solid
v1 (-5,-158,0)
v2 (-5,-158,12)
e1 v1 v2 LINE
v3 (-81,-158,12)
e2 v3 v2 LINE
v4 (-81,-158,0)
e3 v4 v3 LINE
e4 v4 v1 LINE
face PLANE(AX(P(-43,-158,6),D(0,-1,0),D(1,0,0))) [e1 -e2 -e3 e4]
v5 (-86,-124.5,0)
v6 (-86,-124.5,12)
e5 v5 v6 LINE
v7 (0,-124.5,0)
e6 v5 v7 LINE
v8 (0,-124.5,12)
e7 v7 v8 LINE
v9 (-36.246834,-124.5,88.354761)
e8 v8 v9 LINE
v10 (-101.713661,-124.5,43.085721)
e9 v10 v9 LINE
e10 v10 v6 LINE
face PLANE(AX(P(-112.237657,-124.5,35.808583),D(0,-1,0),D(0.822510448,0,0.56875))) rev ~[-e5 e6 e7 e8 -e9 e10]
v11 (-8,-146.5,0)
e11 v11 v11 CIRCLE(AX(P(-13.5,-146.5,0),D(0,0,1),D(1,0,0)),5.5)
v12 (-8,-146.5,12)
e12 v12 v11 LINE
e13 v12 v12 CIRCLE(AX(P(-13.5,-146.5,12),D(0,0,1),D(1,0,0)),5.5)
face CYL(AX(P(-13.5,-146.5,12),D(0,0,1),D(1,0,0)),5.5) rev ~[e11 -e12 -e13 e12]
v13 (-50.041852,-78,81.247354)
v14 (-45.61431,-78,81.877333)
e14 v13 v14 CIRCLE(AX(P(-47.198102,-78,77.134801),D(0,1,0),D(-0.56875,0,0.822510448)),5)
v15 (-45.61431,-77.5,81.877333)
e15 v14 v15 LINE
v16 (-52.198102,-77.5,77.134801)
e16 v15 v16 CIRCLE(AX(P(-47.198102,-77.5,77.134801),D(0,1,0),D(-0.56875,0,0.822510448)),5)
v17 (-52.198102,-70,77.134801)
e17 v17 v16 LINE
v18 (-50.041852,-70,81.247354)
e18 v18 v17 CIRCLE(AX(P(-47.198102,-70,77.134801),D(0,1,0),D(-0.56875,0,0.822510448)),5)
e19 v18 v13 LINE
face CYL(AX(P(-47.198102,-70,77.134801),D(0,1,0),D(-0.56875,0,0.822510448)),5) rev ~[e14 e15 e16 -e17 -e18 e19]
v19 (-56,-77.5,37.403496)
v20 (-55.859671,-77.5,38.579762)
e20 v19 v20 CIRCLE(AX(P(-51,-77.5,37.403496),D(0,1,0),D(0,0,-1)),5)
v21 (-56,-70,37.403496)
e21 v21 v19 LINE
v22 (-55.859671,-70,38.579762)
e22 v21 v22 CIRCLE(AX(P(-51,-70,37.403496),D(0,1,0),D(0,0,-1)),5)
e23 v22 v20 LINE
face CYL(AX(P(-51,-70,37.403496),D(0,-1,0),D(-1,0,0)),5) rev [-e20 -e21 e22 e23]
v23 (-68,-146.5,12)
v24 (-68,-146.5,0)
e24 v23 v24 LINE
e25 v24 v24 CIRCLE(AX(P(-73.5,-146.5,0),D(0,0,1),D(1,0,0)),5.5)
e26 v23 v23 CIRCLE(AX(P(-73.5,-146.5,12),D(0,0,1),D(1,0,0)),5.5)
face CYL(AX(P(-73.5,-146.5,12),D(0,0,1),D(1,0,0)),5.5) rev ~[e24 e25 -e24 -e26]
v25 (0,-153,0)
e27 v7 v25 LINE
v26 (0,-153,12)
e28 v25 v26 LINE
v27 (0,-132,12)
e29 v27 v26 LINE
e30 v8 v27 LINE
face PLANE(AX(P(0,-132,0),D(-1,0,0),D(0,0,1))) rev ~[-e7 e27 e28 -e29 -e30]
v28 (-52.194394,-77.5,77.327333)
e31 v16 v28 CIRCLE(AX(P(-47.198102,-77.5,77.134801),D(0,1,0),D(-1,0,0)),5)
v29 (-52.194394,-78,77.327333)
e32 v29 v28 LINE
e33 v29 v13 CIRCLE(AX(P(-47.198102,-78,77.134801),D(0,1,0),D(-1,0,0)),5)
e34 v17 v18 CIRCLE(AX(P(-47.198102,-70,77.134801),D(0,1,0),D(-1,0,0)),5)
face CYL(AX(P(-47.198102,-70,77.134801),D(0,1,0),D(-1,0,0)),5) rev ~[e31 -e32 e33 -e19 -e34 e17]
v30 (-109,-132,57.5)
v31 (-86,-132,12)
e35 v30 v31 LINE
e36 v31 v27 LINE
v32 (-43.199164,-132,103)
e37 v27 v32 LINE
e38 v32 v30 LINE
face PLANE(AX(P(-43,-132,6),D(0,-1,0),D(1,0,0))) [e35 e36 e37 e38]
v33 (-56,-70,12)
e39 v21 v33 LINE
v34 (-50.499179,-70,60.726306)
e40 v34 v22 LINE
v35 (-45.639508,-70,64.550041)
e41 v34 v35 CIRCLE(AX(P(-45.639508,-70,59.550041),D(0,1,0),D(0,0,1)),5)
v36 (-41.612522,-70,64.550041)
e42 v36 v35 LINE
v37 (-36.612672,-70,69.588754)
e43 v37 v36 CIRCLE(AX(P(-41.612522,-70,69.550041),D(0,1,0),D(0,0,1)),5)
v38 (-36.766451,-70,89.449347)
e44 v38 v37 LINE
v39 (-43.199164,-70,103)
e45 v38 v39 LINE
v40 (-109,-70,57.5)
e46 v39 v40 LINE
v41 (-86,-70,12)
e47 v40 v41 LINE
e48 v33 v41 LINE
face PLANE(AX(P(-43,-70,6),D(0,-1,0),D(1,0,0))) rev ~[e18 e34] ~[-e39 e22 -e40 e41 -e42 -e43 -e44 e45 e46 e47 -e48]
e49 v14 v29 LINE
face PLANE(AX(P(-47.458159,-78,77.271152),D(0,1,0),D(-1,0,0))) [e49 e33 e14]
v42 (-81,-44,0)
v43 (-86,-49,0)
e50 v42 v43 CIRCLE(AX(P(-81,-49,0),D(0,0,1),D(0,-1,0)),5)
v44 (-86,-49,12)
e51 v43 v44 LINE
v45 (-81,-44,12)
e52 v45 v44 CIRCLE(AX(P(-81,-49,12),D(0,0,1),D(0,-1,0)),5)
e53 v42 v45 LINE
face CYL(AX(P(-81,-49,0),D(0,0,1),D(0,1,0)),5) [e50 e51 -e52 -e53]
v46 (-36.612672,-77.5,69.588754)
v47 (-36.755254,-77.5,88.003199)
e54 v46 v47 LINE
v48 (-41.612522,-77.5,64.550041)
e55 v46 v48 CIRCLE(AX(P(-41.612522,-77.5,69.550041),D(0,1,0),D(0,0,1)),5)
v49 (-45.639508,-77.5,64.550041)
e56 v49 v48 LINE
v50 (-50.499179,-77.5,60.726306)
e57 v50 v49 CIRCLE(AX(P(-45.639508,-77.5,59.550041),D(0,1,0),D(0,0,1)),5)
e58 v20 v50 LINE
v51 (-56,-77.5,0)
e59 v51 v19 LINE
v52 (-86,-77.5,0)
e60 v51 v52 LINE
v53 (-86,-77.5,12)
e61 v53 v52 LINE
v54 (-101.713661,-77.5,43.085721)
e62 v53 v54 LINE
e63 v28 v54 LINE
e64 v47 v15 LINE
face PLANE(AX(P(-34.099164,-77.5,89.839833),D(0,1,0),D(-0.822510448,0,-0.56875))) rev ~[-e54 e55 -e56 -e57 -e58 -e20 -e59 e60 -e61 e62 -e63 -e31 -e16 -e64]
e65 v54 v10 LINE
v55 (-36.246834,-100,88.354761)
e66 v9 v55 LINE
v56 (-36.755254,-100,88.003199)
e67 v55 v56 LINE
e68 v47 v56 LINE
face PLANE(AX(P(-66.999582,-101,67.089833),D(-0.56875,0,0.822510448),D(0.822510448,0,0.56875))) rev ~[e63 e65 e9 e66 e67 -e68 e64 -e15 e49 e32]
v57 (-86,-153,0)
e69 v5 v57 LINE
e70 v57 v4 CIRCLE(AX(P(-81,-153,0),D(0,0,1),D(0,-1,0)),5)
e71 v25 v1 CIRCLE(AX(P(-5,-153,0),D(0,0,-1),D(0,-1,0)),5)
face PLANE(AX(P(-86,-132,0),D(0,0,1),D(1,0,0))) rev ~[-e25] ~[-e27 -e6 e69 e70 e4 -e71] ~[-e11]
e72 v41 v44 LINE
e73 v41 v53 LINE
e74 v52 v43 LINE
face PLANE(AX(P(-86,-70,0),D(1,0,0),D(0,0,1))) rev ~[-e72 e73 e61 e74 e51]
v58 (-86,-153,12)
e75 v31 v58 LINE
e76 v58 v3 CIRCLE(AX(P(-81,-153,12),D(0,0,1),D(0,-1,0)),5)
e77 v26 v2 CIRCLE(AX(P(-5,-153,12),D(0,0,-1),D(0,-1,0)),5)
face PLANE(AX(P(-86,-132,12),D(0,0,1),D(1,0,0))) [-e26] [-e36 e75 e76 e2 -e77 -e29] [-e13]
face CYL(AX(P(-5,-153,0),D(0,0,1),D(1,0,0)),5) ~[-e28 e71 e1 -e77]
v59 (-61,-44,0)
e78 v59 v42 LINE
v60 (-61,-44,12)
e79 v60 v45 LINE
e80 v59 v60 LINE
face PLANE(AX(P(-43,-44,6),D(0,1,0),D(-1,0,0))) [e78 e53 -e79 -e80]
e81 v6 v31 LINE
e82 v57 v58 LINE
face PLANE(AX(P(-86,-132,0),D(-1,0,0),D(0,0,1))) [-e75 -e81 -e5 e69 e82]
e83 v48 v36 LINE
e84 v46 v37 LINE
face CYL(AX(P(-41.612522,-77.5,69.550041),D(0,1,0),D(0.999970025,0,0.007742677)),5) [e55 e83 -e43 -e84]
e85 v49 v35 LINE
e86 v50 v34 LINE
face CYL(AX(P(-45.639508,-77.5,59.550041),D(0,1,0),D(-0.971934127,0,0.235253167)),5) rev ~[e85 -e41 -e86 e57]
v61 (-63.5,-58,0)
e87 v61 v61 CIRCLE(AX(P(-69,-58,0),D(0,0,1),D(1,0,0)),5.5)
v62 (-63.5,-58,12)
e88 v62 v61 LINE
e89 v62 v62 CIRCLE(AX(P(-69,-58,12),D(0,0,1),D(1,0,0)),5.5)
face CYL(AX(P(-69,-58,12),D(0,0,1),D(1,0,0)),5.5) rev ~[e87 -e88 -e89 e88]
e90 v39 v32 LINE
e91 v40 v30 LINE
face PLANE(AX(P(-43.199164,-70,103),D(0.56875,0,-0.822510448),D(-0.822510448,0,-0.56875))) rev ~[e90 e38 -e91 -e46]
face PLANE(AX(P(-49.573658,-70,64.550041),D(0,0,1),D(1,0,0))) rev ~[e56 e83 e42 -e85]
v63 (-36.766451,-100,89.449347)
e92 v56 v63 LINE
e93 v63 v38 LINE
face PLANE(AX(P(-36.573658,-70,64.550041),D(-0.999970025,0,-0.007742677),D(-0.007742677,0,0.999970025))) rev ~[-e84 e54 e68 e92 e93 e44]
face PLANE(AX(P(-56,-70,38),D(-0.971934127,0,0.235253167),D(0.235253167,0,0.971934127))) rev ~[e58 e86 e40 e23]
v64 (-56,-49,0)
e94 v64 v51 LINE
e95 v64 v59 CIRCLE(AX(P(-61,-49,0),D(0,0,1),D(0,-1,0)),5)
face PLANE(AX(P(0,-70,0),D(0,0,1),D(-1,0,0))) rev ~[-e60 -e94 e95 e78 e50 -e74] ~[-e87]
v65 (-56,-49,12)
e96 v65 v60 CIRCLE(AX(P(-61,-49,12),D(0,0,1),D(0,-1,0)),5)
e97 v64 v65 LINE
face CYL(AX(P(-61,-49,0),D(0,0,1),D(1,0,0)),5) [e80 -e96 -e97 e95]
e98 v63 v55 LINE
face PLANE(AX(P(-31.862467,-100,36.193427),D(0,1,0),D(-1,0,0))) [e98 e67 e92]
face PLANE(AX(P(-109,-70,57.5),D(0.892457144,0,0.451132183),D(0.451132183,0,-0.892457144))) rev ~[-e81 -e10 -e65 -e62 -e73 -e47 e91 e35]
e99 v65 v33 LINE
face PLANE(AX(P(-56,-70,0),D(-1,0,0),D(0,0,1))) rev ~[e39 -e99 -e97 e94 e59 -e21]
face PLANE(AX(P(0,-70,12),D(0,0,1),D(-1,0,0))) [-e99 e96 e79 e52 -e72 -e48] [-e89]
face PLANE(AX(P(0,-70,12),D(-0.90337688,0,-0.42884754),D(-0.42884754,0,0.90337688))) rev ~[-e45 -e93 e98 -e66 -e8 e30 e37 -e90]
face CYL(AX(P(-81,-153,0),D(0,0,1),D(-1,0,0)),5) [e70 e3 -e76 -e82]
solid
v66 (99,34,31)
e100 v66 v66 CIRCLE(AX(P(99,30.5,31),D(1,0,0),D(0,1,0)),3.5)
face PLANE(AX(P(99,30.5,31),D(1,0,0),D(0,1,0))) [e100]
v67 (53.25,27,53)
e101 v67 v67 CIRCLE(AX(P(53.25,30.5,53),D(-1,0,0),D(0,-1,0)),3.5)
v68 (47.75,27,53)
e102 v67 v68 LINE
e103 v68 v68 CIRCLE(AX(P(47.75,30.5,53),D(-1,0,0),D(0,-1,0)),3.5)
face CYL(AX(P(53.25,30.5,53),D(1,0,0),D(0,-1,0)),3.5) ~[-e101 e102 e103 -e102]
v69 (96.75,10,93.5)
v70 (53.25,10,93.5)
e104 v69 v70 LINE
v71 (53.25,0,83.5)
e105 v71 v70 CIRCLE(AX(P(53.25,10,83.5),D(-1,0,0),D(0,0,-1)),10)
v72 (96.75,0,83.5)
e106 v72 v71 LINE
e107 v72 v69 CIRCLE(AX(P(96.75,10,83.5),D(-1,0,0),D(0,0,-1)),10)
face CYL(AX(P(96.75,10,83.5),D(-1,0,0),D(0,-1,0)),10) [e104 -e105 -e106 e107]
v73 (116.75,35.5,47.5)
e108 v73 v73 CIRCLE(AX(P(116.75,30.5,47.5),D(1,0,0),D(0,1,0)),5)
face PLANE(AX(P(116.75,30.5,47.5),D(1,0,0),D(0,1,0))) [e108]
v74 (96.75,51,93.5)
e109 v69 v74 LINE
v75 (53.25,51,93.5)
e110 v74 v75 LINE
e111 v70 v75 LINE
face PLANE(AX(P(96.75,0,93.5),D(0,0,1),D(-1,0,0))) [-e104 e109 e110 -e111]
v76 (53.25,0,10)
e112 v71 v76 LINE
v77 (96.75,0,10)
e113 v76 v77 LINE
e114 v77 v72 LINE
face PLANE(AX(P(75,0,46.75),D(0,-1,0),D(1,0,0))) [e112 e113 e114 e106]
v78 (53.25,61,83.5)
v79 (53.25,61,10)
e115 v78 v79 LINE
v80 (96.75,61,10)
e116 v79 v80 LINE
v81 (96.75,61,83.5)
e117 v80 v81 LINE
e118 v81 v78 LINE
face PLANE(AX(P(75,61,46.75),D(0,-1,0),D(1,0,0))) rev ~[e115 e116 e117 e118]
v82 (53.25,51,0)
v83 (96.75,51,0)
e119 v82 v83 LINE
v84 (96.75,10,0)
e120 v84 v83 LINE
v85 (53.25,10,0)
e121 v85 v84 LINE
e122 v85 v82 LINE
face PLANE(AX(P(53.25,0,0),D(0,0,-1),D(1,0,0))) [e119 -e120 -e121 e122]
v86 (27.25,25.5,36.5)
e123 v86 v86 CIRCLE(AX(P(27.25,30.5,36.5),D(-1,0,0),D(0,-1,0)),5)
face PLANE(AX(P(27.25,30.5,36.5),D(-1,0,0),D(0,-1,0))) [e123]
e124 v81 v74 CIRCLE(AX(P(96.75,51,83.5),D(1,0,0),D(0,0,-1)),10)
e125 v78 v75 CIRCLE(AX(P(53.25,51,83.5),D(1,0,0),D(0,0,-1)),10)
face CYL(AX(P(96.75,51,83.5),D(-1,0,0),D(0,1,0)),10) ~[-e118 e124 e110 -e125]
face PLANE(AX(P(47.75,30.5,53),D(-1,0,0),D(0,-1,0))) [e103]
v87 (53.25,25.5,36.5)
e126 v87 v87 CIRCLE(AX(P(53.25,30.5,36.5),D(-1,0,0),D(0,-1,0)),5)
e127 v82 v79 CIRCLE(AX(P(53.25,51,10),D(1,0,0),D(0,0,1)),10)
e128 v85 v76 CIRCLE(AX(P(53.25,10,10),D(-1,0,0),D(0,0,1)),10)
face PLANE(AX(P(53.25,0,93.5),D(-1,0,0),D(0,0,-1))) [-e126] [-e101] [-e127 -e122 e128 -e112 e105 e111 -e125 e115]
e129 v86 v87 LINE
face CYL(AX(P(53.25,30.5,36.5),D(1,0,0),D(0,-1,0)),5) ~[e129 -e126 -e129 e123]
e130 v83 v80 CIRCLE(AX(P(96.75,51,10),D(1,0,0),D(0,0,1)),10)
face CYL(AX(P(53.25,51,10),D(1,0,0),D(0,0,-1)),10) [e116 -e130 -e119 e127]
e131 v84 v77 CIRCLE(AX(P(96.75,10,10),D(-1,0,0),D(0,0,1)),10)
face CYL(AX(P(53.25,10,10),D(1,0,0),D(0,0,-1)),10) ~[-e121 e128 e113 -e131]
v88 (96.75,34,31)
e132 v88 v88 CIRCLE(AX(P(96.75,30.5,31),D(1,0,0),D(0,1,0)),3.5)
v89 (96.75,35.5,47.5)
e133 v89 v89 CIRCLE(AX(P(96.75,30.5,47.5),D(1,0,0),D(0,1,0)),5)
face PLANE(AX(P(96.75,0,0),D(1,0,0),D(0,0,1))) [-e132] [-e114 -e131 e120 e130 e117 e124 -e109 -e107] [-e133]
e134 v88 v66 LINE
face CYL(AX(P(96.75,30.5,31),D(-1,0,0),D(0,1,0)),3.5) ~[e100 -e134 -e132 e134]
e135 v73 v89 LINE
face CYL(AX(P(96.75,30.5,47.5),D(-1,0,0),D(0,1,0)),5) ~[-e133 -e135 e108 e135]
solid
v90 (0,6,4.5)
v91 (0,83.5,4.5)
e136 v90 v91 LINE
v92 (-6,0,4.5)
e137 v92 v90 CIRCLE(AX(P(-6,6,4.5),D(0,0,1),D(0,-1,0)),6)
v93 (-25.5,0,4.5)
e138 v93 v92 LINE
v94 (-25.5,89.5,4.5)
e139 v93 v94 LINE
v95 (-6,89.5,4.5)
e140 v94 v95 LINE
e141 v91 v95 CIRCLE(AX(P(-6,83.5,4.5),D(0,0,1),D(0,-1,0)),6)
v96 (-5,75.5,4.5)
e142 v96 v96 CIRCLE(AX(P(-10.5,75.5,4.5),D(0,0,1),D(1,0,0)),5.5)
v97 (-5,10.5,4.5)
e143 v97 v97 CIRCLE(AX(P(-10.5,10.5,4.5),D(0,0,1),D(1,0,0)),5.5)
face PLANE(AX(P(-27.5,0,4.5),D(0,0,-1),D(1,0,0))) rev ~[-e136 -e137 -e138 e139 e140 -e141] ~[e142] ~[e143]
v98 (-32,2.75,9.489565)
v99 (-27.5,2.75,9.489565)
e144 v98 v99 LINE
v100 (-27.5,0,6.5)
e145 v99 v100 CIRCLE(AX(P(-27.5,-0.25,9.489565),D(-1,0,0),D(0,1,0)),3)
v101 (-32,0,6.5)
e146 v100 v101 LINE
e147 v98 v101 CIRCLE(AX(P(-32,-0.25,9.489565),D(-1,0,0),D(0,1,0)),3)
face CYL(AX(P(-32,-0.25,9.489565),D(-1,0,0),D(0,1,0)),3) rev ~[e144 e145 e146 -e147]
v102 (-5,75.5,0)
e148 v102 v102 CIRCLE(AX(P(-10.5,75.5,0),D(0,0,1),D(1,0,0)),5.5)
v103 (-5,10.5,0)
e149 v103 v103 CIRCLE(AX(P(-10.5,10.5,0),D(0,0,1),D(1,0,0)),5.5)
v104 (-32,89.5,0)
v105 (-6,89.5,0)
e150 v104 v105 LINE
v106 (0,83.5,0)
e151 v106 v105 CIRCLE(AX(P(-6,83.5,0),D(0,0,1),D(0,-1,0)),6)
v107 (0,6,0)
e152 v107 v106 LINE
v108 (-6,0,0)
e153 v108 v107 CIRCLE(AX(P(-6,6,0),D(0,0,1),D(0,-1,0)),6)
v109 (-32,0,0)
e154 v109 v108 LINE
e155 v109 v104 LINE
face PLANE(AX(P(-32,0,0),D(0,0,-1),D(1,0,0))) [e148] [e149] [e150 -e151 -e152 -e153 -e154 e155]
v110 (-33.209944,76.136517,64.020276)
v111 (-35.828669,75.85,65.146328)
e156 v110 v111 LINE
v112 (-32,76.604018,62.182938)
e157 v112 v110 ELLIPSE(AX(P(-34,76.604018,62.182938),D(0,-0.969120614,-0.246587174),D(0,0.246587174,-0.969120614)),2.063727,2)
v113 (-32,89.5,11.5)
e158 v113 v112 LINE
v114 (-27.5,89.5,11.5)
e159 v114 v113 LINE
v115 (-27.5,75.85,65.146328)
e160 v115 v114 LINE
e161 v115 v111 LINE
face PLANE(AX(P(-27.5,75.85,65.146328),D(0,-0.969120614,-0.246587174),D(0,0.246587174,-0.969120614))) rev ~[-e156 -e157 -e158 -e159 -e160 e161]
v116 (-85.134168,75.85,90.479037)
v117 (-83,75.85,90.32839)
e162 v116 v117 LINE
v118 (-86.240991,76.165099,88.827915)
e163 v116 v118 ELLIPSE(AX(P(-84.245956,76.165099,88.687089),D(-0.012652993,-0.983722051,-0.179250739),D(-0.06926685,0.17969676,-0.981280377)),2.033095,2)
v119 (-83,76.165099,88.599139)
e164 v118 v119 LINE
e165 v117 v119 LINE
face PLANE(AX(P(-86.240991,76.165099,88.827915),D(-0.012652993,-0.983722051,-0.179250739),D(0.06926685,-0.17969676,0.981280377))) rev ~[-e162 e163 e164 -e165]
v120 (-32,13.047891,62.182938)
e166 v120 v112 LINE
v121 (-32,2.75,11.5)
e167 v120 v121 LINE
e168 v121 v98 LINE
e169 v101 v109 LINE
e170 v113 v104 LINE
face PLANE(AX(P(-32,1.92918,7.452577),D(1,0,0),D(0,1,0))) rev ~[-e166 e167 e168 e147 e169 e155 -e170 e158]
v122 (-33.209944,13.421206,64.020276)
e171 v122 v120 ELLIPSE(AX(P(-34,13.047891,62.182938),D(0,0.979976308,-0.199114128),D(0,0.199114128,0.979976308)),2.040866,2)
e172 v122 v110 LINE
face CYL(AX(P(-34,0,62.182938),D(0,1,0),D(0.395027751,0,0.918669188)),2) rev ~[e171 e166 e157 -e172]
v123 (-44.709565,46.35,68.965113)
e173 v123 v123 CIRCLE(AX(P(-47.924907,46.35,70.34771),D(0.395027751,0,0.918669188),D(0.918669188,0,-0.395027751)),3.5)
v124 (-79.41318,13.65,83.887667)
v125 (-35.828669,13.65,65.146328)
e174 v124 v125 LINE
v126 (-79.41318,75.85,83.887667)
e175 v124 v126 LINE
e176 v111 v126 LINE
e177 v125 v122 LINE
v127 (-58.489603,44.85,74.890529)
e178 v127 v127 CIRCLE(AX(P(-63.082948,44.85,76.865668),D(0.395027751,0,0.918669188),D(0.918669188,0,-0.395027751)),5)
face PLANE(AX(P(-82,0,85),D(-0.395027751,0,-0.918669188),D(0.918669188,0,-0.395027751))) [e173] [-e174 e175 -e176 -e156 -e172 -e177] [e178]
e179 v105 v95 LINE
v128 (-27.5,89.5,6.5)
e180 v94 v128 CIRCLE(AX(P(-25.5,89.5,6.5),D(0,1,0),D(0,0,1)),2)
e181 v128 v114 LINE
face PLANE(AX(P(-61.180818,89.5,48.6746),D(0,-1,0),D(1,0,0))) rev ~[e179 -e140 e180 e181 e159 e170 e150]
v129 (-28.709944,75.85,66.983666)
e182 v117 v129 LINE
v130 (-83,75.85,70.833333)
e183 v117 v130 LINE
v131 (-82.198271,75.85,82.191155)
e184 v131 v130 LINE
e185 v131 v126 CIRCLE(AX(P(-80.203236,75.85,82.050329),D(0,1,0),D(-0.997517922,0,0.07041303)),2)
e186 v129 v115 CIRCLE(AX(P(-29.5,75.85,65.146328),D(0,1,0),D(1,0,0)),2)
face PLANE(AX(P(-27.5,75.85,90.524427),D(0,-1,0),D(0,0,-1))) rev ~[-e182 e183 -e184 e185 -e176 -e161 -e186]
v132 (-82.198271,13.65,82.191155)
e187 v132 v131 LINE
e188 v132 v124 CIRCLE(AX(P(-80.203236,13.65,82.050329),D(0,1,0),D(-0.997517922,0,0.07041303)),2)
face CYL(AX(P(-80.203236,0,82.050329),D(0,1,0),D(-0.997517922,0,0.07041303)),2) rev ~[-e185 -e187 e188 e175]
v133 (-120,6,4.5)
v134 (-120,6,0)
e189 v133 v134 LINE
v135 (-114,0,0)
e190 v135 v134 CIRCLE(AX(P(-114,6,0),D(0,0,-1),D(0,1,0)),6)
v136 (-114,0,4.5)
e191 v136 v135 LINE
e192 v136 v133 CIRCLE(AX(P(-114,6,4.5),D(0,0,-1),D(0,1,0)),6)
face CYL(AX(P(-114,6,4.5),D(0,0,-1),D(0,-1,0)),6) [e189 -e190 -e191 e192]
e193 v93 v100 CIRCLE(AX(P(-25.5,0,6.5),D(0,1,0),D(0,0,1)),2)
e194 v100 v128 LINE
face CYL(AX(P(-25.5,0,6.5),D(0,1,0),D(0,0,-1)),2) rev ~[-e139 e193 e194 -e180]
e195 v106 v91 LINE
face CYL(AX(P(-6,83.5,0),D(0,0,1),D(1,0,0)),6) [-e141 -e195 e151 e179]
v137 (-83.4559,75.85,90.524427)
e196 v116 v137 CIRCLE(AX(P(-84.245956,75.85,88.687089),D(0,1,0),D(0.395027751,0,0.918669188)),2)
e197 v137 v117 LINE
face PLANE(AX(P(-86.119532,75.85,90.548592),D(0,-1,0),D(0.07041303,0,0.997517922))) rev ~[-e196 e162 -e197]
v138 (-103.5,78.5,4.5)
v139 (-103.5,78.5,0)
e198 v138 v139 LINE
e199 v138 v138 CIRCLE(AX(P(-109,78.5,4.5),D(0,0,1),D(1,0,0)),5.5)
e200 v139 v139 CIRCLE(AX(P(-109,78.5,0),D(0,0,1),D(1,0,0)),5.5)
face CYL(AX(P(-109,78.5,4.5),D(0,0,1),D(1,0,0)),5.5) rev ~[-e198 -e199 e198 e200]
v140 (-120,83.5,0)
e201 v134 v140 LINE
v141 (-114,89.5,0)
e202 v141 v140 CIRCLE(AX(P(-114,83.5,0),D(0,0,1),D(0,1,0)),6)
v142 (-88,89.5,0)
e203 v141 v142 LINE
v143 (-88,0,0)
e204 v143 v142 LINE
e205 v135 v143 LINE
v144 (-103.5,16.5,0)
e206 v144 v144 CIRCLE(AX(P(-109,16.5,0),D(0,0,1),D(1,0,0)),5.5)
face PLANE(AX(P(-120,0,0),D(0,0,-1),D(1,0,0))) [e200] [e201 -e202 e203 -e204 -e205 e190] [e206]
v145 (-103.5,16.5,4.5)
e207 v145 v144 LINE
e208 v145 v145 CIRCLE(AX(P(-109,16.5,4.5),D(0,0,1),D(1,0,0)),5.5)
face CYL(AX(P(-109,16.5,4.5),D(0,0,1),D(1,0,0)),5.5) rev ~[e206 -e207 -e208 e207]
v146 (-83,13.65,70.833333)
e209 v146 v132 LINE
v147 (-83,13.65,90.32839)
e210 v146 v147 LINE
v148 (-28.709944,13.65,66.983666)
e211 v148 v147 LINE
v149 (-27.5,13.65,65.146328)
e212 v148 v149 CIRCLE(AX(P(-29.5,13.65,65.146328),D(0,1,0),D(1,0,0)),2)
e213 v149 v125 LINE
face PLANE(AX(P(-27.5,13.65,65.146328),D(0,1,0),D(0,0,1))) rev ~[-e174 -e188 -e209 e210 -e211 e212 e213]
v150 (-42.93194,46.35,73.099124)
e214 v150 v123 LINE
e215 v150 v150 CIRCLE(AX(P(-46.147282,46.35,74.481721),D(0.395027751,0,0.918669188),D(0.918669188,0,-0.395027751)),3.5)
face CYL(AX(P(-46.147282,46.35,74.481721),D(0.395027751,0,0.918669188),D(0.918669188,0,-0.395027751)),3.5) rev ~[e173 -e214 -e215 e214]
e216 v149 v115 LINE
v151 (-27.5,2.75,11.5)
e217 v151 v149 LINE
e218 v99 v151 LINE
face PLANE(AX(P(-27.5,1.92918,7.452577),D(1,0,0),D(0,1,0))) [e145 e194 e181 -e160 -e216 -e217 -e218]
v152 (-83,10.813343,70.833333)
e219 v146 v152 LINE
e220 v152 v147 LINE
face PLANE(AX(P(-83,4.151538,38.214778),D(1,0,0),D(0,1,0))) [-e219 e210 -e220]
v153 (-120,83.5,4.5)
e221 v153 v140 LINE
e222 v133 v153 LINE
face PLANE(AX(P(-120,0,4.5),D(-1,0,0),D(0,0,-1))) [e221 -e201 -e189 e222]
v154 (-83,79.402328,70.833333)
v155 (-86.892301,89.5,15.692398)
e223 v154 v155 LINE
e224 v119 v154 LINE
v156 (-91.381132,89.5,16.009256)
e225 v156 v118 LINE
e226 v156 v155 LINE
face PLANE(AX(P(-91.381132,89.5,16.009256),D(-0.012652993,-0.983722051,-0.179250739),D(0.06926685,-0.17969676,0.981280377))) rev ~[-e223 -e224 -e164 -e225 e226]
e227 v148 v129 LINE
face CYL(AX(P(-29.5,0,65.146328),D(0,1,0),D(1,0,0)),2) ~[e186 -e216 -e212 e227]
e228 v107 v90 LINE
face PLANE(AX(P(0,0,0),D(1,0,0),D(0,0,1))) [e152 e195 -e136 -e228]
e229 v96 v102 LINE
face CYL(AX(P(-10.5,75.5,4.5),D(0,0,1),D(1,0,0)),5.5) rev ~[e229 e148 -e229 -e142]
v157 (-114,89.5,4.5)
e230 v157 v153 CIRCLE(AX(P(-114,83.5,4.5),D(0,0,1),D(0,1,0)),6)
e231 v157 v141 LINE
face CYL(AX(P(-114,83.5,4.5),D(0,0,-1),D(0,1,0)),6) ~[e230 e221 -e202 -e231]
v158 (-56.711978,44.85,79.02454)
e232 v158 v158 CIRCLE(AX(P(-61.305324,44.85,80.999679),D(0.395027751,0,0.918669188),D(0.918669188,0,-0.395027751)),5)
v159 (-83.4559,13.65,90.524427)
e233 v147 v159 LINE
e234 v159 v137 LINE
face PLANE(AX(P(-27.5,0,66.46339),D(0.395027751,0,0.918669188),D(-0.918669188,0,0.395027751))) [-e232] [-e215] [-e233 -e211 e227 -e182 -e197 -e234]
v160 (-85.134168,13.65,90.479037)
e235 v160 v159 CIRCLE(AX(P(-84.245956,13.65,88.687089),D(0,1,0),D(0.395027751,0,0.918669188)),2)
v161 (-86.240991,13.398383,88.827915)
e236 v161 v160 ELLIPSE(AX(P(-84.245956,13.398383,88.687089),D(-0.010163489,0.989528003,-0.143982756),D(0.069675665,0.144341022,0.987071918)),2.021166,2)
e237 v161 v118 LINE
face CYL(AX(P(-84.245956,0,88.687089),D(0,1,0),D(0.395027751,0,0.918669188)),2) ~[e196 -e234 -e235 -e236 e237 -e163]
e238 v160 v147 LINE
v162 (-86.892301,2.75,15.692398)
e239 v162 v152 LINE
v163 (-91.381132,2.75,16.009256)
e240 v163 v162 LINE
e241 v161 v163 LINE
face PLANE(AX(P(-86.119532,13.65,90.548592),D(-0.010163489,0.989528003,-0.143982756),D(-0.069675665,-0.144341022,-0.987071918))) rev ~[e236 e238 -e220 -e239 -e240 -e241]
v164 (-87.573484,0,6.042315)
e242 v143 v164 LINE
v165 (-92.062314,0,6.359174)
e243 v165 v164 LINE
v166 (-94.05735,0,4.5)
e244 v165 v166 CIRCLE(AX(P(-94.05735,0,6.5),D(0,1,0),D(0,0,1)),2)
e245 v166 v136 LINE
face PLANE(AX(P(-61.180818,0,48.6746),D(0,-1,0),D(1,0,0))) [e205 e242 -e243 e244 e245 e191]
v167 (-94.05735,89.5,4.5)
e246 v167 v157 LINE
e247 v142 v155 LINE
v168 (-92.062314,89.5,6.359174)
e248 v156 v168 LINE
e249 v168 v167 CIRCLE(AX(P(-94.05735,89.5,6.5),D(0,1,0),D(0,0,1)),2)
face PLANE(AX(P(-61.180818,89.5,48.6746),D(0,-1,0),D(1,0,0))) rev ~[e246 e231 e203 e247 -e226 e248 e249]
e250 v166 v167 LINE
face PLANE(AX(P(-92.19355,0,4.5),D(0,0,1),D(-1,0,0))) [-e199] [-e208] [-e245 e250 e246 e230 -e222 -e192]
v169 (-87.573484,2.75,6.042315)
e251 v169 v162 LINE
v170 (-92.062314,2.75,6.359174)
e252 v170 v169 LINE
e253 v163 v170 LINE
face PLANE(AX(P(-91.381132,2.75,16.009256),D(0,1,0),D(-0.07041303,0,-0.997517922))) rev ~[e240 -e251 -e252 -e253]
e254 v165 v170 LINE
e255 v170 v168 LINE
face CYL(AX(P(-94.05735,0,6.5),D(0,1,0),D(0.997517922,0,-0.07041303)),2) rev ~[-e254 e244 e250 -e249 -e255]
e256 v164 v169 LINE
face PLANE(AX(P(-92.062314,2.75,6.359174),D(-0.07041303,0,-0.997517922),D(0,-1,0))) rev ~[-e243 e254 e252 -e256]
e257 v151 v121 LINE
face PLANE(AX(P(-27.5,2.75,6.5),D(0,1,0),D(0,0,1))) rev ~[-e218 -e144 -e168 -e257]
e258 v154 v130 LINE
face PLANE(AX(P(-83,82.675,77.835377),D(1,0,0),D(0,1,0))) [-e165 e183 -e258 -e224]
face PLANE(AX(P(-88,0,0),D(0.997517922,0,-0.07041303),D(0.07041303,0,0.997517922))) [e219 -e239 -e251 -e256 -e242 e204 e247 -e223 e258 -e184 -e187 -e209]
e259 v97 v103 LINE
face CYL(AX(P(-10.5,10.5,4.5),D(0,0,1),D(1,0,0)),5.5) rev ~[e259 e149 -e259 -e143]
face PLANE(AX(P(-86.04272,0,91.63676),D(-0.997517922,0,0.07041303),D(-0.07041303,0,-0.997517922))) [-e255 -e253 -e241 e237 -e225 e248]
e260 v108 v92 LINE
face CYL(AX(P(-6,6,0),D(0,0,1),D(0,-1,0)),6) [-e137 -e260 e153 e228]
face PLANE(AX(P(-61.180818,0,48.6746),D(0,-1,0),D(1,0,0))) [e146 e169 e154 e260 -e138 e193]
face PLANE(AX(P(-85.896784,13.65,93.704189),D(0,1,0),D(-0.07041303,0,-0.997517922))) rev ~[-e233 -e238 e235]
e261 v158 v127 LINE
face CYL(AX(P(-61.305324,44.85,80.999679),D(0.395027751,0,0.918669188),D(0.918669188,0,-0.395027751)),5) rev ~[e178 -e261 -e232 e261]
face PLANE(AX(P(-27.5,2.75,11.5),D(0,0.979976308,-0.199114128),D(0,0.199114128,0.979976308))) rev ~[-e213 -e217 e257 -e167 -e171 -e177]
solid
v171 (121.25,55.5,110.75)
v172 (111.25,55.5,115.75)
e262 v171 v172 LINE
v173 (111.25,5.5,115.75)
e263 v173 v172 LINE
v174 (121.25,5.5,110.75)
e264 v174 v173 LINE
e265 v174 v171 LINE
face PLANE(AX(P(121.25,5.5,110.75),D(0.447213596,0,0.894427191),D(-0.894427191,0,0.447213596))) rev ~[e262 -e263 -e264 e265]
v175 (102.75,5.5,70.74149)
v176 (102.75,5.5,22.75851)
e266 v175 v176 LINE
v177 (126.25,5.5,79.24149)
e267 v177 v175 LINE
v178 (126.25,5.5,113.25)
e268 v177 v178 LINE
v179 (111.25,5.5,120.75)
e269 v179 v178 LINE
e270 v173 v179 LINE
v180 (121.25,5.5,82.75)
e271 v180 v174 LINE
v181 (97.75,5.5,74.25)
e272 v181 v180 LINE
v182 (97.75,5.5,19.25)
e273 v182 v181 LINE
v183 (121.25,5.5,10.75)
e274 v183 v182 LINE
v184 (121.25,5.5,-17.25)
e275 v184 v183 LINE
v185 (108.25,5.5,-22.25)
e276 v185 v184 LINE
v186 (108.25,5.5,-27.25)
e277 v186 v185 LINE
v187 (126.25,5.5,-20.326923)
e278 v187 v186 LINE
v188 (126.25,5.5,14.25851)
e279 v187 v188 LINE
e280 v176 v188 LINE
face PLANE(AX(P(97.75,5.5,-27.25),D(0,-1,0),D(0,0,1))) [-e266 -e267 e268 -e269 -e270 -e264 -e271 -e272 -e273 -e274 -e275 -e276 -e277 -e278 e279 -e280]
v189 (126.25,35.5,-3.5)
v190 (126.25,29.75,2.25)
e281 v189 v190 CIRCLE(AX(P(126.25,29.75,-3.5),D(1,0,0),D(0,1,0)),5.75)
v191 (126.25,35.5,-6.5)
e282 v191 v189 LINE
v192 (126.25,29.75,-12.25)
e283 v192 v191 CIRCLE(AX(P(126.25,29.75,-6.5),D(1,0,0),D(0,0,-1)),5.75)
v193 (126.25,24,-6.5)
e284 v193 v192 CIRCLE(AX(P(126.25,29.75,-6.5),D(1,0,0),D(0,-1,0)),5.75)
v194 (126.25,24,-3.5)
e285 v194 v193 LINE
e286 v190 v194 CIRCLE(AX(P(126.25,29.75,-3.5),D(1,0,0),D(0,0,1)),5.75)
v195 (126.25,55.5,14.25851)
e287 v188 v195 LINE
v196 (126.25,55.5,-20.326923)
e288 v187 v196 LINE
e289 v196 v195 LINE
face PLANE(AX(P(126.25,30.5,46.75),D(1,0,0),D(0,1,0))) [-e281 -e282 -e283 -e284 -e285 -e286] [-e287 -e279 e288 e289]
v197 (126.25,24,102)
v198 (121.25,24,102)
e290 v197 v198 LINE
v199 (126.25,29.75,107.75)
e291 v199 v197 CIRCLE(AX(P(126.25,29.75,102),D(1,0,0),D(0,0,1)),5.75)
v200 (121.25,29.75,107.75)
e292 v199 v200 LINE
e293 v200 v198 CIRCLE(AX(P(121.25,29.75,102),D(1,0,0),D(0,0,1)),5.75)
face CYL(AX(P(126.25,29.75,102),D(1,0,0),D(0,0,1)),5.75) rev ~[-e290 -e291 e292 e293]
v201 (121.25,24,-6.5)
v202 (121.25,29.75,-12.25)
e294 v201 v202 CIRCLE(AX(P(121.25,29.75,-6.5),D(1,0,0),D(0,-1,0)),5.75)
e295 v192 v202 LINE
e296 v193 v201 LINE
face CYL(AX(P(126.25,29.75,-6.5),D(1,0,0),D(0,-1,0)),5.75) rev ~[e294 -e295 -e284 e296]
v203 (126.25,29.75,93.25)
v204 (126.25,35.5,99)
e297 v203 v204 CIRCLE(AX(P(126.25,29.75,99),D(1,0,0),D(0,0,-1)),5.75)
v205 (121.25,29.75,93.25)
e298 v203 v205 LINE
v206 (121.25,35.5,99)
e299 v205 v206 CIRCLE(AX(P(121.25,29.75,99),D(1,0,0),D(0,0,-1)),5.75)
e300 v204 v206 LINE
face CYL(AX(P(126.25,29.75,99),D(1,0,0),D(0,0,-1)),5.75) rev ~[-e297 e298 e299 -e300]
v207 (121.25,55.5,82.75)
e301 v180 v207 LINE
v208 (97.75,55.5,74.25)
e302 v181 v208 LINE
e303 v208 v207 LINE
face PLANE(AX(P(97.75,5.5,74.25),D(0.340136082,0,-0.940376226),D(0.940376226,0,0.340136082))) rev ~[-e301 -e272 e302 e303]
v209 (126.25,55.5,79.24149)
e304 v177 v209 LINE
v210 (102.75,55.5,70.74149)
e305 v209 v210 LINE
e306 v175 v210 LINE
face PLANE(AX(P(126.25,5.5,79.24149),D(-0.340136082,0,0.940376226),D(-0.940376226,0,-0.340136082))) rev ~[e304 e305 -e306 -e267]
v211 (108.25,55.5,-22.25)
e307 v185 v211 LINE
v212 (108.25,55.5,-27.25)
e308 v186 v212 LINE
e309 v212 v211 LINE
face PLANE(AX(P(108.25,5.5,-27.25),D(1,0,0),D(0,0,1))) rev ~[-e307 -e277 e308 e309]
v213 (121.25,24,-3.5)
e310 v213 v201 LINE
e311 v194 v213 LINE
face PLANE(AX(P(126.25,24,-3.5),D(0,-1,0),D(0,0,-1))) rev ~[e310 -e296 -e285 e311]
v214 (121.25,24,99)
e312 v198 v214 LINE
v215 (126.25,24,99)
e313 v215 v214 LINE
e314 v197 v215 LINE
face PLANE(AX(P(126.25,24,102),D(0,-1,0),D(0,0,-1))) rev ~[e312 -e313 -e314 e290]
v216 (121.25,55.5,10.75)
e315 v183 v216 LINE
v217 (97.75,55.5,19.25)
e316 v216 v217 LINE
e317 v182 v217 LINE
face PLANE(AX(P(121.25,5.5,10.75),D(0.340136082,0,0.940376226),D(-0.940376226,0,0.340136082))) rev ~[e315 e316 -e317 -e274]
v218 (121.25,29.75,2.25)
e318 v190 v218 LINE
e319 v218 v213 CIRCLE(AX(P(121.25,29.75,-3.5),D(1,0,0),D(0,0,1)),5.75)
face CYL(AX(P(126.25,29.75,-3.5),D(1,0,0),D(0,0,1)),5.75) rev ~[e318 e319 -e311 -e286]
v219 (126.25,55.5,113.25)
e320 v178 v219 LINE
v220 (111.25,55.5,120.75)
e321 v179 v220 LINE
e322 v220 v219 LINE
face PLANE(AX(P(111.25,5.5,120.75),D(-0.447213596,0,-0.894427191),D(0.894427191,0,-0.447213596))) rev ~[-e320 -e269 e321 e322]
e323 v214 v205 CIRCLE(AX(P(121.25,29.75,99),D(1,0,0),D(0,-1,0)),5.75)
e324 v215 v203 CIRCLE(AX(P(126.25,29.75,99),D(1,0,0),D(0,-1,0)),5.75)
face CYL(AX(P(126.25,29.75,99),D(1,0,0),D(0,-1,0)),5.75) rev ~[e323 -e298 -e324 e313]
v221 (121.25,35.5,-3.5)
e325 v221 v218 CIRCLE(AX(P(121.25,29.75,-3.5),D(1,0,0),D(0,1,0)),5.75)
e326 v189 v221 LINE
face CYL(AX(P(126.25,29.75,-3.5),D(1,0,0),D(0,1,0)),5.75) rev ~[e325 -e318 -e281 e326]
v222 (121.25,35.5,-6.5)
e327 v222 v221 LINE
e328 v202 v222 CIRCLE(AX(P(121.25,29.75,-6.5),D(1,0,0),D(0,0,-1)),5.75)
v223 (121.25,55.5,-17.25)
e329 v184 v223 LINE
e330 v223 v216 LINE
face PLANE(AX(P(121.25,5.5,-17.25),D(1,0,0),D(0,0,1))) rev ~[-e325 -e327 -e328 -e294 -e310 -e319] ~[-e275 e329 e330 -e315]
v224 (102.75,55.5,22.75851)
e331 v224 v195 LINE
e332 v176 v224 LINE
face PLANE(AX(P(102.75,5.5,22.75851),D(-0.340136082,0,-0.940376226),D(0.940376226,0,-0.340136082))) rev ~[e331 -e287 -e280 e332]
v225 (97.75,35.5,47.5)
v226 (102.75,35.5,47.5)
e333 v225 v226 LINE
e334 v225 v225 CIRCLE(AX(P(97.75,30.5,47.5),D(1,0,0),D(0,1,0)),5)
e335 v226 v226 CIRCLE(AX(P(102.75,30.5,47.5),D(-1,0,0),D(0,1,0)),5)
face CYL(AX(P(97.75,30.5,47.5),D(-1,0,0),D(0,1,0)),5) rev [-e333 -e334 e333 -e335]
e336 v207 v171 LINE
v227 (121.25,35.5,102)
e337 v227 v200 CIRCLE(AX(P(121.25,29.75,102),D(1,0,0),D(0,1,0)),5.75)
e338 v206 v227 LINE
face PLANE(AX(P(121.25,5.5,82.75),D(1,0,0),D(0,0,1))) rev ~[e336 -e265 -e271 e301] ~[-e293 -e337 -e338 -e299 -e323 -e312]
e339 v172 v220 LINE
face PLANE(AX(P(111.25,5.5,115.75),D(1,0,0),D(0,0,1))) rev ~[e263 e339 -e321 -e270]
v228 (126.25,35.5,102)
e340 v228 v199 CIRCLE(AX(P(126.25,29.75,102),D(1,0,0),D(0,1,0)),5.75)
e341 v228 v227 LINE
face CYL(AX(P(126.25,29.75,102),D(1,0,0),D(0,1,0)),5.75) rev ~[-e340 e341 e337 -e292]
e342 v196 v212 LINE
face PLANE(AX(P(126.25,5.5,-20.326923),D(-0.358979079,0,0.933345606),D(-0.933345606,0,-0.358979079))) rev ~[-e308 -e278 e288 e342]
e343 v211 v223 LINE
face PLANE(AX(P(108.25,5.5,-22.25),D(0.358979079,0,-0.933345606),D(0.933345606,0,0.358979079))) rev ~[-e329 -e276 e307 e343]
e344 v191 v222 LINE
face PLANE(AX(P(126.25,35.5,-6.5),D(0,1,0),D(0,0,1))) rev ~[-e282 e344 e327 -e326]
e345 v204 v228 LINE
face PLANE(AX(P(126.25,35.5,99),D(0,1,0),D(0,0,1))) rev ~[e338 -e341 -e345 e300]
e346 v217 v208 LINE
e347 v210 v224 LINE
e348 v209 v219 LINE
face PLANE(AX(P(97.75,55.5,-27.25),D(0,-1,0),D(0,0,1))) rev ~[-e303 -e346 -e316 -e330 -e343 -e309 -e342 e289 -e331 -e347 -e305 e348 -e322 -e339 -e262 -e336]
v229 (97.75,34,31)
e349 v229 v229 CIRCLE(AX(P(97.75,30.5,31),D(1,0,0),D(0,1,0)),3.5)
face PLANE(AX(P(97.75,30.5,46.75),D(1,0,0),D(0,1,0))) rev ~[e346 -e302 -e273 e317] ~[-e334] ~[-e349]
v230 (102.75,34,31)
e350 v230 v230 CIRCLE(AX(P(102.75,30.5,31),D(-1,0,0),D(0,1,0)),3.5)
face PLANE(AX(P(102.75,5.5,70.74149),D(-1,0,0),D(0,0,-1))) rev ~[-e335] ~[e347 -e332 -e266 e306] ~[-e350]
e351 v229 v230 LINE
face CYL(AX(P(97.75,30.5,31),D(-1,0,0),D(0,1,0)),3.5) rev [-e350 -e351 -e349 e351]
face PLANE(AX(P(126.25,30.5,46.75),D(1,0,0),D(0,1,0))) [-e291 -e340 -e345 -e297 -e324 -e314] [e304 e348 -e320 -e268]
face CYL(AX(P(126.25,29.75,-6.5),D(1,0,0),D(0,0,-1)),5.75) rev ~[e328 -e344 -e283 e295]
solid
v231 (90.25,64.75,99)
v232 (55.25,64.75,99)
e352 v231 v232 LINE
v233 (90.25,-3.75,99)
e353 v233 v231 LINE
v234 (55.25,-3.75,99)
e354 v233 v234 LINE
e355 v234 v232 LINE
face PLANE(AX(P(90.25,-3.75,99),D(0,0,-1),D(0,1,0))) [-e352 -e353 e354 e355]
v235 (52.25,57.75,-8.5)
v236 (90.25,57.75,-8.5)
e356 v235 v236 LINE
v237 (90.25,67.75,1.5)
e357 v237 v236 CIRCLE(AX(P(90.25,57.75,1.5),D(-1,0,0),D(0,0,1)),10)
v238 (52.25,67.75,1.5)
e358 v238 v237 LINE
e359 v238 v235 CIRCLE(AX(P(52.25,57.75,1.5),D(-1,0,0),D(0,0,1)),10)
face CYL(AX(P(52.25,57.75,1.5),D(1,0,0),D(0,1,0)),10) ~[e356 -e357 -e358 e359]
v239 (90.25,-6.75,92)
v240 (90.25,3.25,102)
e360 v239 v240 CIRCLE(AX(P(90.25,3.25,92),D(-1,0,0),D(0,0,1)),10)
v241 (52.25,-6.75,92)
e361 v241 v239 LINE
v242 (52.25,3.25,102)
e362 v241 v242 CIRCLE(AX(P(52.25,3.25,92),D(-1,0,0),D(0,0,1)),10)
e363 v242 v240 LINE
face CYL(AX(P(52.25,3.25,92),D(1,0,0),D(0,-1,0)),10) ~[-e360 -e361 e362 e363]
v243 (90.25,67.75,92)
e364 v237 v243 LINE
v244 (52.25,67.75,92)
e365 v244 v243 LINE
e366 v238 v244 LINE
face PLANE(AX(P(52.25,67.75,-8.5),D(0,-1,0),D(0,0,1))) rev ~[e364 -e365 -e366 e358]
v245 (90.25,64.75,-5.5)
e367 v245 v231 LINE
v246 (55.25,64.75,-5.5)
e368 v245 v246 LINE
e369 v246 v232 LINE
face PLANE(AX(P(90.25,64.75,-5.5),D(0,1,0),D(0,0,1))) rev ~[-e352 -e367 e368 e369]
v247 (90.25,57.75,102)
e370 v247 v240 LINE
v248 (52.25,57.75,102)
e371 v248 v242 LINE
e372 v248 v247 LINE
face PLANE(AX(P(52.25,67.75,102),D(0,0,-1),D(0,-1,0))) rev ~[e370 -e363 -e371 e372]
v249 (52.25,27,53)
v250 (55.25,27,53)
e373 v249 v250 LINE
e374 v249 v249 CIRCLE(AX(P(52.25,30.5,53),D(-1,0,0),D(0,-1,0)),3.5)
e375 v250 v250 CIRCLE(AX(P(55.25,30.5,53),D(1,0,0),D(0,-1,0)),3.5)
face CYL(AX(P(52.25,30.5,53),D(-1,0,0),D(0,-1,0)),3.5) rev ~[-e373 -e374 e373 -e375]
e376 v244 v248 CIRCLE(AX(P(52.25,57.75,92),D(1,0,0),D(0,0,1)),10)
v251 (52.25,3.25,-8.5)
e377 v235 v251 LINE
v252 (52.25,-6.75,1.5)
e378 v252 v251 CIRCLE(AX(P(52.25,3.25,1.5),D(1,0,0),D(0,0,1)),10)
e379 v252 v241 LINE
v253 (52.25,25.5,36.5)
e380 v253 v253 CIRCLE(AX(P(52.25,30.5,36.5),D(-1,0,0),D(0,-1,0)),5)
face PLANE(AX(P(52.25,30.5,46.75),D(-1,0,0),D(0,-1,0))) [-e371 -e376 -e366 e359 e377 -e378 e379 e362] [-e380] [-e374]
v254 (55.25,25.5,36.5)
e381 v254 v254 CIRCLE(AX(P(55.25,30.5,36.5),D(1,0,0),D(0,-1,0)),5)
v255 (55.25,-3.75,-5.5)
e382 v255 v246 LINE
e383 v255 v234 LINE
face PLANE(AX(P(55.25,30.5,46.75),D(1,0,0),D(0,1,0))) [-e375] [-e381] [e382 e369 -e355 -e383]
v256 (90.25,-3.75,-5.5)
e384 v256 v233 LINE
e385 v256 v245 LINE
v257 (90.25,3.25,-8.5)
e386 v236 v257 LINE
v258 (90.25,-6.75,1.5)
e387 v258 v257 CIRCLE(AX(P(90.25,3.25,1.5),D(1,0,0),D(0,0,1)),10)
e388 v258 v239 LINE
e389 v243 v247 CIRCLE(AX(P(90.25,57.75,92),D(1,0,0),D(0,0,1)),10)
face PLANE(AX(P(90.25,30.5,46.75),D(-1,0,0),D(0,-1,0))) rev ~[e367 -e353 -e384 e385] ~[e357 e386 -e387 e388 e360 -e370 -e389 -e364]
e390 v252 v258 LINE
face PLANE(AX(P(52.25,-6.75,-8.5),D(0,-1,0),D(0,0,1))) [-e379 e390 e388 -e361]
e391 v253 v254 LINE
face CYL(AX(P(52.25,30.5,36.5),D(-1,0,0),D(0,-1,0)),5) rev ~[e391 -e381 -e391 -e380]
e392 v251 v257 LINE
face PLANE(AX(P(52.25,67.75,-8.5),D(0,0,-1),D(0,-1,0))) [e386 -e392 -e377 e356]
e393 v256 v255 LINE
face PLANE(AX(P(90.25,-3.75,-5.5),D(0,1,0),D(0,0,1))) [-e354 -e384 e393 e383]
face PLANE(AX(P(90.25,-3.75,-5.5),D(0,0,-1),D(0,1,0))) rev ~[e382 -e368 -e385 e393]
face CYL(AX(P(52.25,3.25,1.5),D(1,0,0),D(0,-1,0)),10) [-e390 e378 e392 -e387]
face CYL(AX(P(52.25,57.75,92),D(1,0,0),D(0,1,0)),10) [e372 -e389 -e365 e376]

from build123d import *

# Parameters (mm, degrees)
F0_W        = 27.5
F0_H        = 4.5
F1_DEPTH    = 89.5
F2_R        = 2
F4_DEPTH    = 55.5
F5_T1_DEPTH = 4.5
F7_DEPTH    = 25
F8_R        = 5.5
F9_DEPTH    = 5
F10_R       = 5.5
F11_DEPTH   = 5
F12_R       = 5
F12_R_2     = 3.5
F13_DEPTH   = 5
F14_R       = 6
F16_DEPTH   = 61
F17_R       = 5
F18_DEPTH   = 20
F17_R_2     = 3.5
F19_DEPTH   = 2.25
F20_R       = 5
F21_DEPTH   = 26
F20_R_2     = 3.5
F22_DEPTH   = 5.5
F23_R       = 10
F25_W       = 74.5
F25_H       = 110.5
F25_R       = 5
F25_R_2     = 3.5
F26_DEPTH   = 38
F27_W       = 68.5
F27_H       = 104.5
F27_R       = 5
F27_R_2     = 3.5
F28_DEPTH   = 35
F29_R       = 10
F31_W       = 50
F31_H       = 148
F31_R       = 3.5
F31_R_2     = 5
F32_DEPTH   = 28.5
F34_DEPTH   = 50
F36_DEPTH   = 5
F38_W       = 86
F38_H       = 12
F39_DEPTH   = 62
F41_W       = 80
F41_H       = 47
F41_W_2     = 15
F42_DEPTH   = 95
F43_W       = 86
F43_H       = 12
F44_DEPTH   = 26
F45_W       = 86
F45_H       = 12
F46_DEPTH   = 26
F48_DEPTH   = 30
F50_DEPTH   = 8
F51_R       = 5
F52_R       = 5.5
F53_DEPTH   = 12
F54_R       = 5
F55_R       = 5.5
F56_DEPTH   = 25


# Not quite as in the source:
# - a fillet or chamfer that OpenCascade refuses, or shapes differently, is made with other operations: its cross-section is extruded or revolved along the edge and cut away or added


with BuildPart() as f1:
    # F0 (on Front) → F1 (new body)
    with BuildSketch(Plane.XZ):
        Polygon((-32, 0), (-27.5, 0), (-27.5, 4.5), (-27.5, 66.4633900416), (-86.0427199911, 91.6367596378), (-92.1935500832, 4.5), (-92.4888345559, 0.3168033031), (-92.5, 0), (-88, 0), (-82, 85), (-32, 63.5), align=None)
        with Locations((-13.75, 2.25)):
            Rectangle(F0_W, F0_H)
        Polygon((-120, 0), (-92.5, 0), (-92.4888345559, 0.3168033031), (-92.1935500832, 4.5), (-120, 4.5), align=None)
    extrude(amount=-F1_DEPTH)

    # F2
    f2_edges = [f1.edges().sort_by_distance(p)[0] for p in [
        (-86.04272, 44.75, 91.63676),
        (-82, 44.75, 85),
        (-32, 44.75, 63.5),
        (-27.5, 44.75, 66.46339),
        (-92.19355, 44.75, 4.5),
        (-27.5, 44.75, 4.5),
    ]]
    fillet(f2_edges, radius=F2_R)

    # F3 (on face) → F4 (cut)
    with BuildSketch(Plane.YZ.offset(-27.5)):
        Polygon((89.5, 66.9836661761), (89.5, 90.5244270628), (75.85, 90.5244270628), (75.85, 65.1463278009), (89.5, 65.1463278009), align=None)
        Polygon((89.5, 65.1463278009), (75.85, 65.1463278009), (89.5, 11.5), align=None)
        Polygon((2.75, 11.5), (13.65, 65.1463278009), (0, 65.1463278009), (0, 6.5), (2.75, 6.5), align=None)
        Polygon((13.65, 65.1463278009), (13.65, 90.5244270628), (0, 90.5244270628), (0, 66.9836661761), (0, 65.1463278009), align=None)
    extrude(amount=-F4_DEPTH, mode=Mode.SUBTRACT)

    # F5: fillet of radius 3 on 1 edges, made by hand

    # F5_s2 → F5_t1 (join)
    with BuildSketch(Plane.YZ.offset(-32)):
        with BuildLine():
            ThreePointArc((2.75, 9.4895651858), (1.9579402166, 7.4585555846), (0, 6.5))
            Line((0, 6.5), (2.75, 6.5))
            Line((2.75, 6.5), (2.75, 9.4895651858))
        make_face()
    extrude(amount=F5_T1_DEPTH)

    # F6 (on face) → F7 (cut)
    with BuildSketch(Plane(origin=(-92.0525271107, 0, 6.4978254431), x_dir=(0, -1, 0), z_dir=(-0.9975179223, 0, 0.0704130298))):
        Polygon((-89.5, 9.5350977863), (-76.1650987076, 82.5349474599), (-89.5, 82.5349474599), align=None)
        Polygon((-89.5, 84.4233556199), (-75.85, 84.4233556199), (-75.85, 87.4233556199), (-89.5, 87.4233556199), (-89.5, 84.5349474599), align=None)
        Polygon((-75.85, 84.2599064816), (-75.85, 84.4233556199), (-89.5, 84.4233556199), (-89.5, 82.5349474599), (-76.1650987076, 82.5349474599), align=None)
        Polygon((-13.65, 87.4233556199), (-13.65, 84.4233556199), (0, 84.4233556199), (0, 84.5349474599), (0, 87.4233556199), align=None)
        Polygon((-13.65, 84.4233556199), (-13.65, 84.2599064816), (-13.398382717, 82.5349474599), (0, 82.5349474599), (0, 84.4233556199), align=None)
        Polygon((0, 82.5349474599), (-13.398382717, 82.5349474599), (-2.75, 9.5350977863), (-2.75, 7.5296530276), (-2.75, -0.1389965028), (0, -0.1389965028), align=None)
    extrude(amount=-F7_DEPTH, mode=Mode.SUBTRACT)

    # F8 (on face) → F9 (cut)
    with BuildSketch(Plane.XY.offset(4.5)):
        with Locations((-10.5, 10.5)):
            Circle(F8_R)
        with Locations((-10.5, 75.5)):
            Circle(F8_R)
    extrude(amount=-F9_DEPTH, mode=Mode.SUBTRACT)

    # F10 (on face) → F11 (cut)
    with BuildSketch(Plane.XY.offset(4.5)):
        with Locations((-109, 16.5)):
            Circle(F10_R)
        with Locations((-109, 78.5)):
            Circle(F10_R)
    extrude(amount=-F11_DEPTH, mode=Mode.SUBTRACT)

    # F12 (on face) → F13 (cut)
    with BuildSketch(Plane(origin=(19.8282620625, 0, 46.1122373547), x_dir=(0.9186691876, 0, -0.3950277507), z_dir=(0.3950277507, 0, 0.9186691876))):
        with Locations((-88.3164328594, 44.85)):
            Circle(F12_R)
        with Locations((-71.8164328594, 46.35)):
            Circle(F12_R_2)
    extrude(amount=-F13_DEPTH, mode=Mode.SUBTRACT)

    # F14
    f14_edges = [f1.edges().sort_by_distance(p)[0] for p in [
        (0, 89.5, 2.25),
        (0, 0, 2.25),
        (-120, 0, 2.25),
        (-120, 89.5, 2.25),
    ]]
    fillet(f14_edges, radius=F14_R)


with BuildPart() as f16:
    # F15 (on Front) → F16 (new body)
    with BuildSketch(Plane.XZ):
        Polygon((53.25, 0), (75, 0), (96.75, 0), (96.75, 93.5), (53.25, 93.5), align=None)
    extrude(amount=-F16_DEPTH)

    # F17 (on face) → F18 (join)
    with BuildSketch(Plane.YZ.offset(96.75)):
        with Locations((30.5, 47.5)):
            Circle(F17_R)
    extrude(amount=F18_DEPTH)

    # F17 (on face) → F19 (join)
    with BuildSketch(Plane.YZ.offset(96.75)):
        with Locations((30.5, 47.5)):
            Circle(F17_R)
        with Locations((30.5, 31)):
            Circle(F17_R_2)
    extrude(amount=F19_DEPTH)

    # F20 (on face) → F21 (join)
    with BuildSketch(Plane(origin=(53.25, 0, 0), x_dir=(0, -1, 0), z_dir=(-1, 0, 0))):
        with Locations((-30.5, 36.5)):
            Circle(F20_R)
    extrude(amount=F21_DEPTH)

    # F20 (on face) → F22 (join)
    with BuildSketch(Plane(origin=(53.25, 0, 0), x_dir=(0, -1, 0), z_dir=(-1, 0, 0))):
        with Locations((-30.5, 36.5)):
            Circle(F20_R)
        with Locations((-30.5, 53)):
            Circle(F20_R_2)
    extrude(amount=F22_DEPTH)

    # F23
    f23_edges = [f16.edges().sort_by_distance(p)[0] for p in [
        (75, 0, 93.5),
        (75, 61, 93.5),
        (75, 61, 0),
        (75, 0, 0),
    ]]
    fillet(f23_edges, radius=F23_R)


with BuildPart() as f26:
    # F25 (on offset) → F26 (new body)
    with BuildSketch(Plane(origin=(52.25, 0, 0), x_dir=(0, -1, 0), z_dir=(-1, 0, 0))):
        with Locations((-30.5, 46.75)):
            Rectangle(F25_W, F25_H)
        with Locations((-30.5, 36.5)):
            Circle(F25_R, mode=Mode.SUBTRACT)
        with Locations((-30.5, 53)):
            Circle(F25_R_2, mode=Mode.SUBTRACT)
    extrude(amount=-F26_DEPTH)

    # F27 (on face) → F28 (cut)
    with BuildSketch(Plane.YZ.offset(90.25)):
        with Locations((30.5, 46.75)):
            Rectangle(F27_W, F27_H)
        with Locations((30.5, 36.5)):
            Circle(F27_R, mode=Mode.SUBTRACT)
        with Locations((30.5, 53)):
            Circle(F27_R_2, mode=Mode.SUBTRACT)
    extrude(amount=-F28_DEPTH, mode=Mode.SUBTRACT)

    # F29
    f29_edges = [f26.edges().sort_by_distance(p)[0] for p in [
        (71.25, -6.75, 102),
        (71.25, 67.75, 102),
        (71.25, 67.75, -8.5),
        (71.25, -6.75, -8.5),
    ]]
    fillet(f29_edges, radius=F29_R)


with BuildPart() as f32:
    # F31 (on offset) → F32 (new body)
    with BuildSketch(Plane.YZ.offset(97.75)):
        with Locations((30.5, 46.75)):
            Rectangle(F31_W, F31_H)
        with Locations((30.5, 31)):
            Circle(F31_R, mode=Mode.SUBTRACT)
        with Locations((30.5, 47.5)):
            Circle(F31_R_2, mode=Mode.SUBTRACT)
    extrude(amount=F32_DEPTH)

    # F33 (on face) → F34 (cut)
    with BuildSketch(Plane.XZ.offset(-5.5)):
        Polygon((111.25, 120.75), (126.25, 113.25), (126.25, 120.75), align=None)
        Polygon((97.75, 120.75), (97.75, 74.25), (121.25, 82.75), (121.25, 110.75), (111.25, 115.75), (111.25, 120.75), align=None)
        Polygon((102.75, 22.7585102126), (126.25, 14.2585102126), (126.25, 79.2414897874), (102.75, 70.7414897874), align=None)
        Polygon((97.75, -27.25), (108.25, -27.25), (108.25, -22.25), (121.25, -17.25), (121.25, 10.75), (97.75, 19.25), align=None)
        Polygon((108.25, -27.25), (126.25, -27.25), (126.25, -20.3269230769), align=None)
    extrude(amount=-F34_DEPTH, mode=Mode.SUBTRACT)

    # F35 (on face) → F36 (cut)
    with BuildSketch(Plane.YZ.offset(126.25)):
        with BuildLine():
            ThreePointArc((29.75, -12.25), (33.8158639918, -10.5658639918), (35.5, -6.5))
            Line((35.5, -6.5), (35.5, -3.5))
            ThreePointArc((35.5, -3.5), (33.8158639918, 0.5658639918), (29.75, 2.25))
            ThreePointArc((29.75, 2.25), (25.6841360082, 0.5658639918), (24, -3.5))
            Line((24, -3.5), (24, -6.5))
            ThreePointArc((24, -6.5), (25.6841360082, -10.5658639918), (29.75, -12.25))
        make_face()
        with BuildLine():
            ThreePointArc((24, 99), (25.6841360082, 94.9341360082), (29.75, 93.25))
            ThreePointArc((29.75, 93.25), (33.8158639918, 94.9341360082), (35.5, 99))
            Line((35.5, 99), (35.5, 102))
            ThreePointArc((35.5, 102), (33.8158639918, 106.0658639918), (29.75, 107.75))
            ThreePointArc((29.75, 107.75), (25.6841360082, 106.0658639918), (24, 102))
            Line((24, 102), (24, 99))
        make_face()
    extrude(amount=-F36_DEPTH, mode=Mode.SUBTRACT)


with BuildPart() as f39:
    # F38 (on offset) → F39 (new body)
    with BuildSketch(Plane.XZ.offset(70)):
        with Locations((-43, 6)):
            Rectangle(F38_W, F38_H)
        Polygon((-86, 12), (0, 12), (-43.199164139, 103), (-109, 57.5), align=None)
    extrude(amount=F39_DEPTH)

    # F41 (on offset) → F42 (cut)
    with BuildSketch(Plane(origin=(-53.0576073158, 0, 76.730437586), x_dir=(0.8225104483, 0, 0.56875), z_dir=(-0.56875, 0, 0.8225104483))):
        with Locations((-16.9505138605, -101)):
            Rectangle(F41_W, F41_H)
        with Locations((-64.4505138605, -101)):
            Rectangle(F41_W_2, F41_H)
    extrude(amount=-F42_DEPTH, mode=Mode.SUBTRACT)

    # F43 (on face) → F44 (join)
    with BuildSketch(Plane.XZ.offset(132)):
        with Locations((-43, 6)):
            Rectangle(F43_W, F43_H)
    extrude(amount=F44_DEPTH)

    # F45 (on face) → F46 (join)
    with BuildSketch(Plane(origin=(0, -70, 0), x_dir=(-1, 0, 0), z_dir=(0, 1, 0))):
        with Locations((43, 6)):
            Rectangle(F45_W, F45_H)
    extrude(amount=F46_DEPTH)

    # F47 (on face) → F48 (cut, symmetric)
    with BuildSketch(Plane(origin=(0, -70, 0), x_dir=(-1, 0, 0), z_dir=(0, 1, 0))):
        Polygon((56, 38), (49.5736579711, 64.5500405693), (36.5736579711, 64.5500405693), (36.7664510416, 89.4493467978), (0, 12), (0, 0), (56, 0), (56, 12), align=None)
    extrude(amount=F48_DEPTH, both=True, mode=Mode.SUBTRACT)

    # F49 (on face) → F50 (cut)
    with BuildSketch(Plane(origin=(0, -70, 0), x_dir=(-1, 0, 0), z_dir=(0, 1, 0))):
        with BuildLine():
            ThreePointArc((52.1981022078, 77.134801483), (51.6263496037, 79.4565734356), (50.0418522078, 81.2473537243))
            ThreePointArc((50.0418522078, 81.2473537243), (42.7698548118, 74.8130295304), (52.1981022078, 77.134801483))
        make_face()
    extrude(amount=-F50_DEPTH, mode=Mode.SUBTRACT)

    # F51
    f51_edges = [f39.edges().sort_by_distance(p)[0] for p in [
        (-36.573658, -73.75, 64.550041),
        (-49.573658, -73.75, 64.550041),
        (-56, -73.75, 38),
    ]]
    fillet(f51_edges, radius=F51_R)

    # F52 (on face) → F53 (cut)
    with BuildSketch(Plane.XY.offset(12)):
        with Locations((-73.5, -146.5)):
            Circle(F52_R)
        with Locations((-13.5, -146.5)):
            Circle(F52_R)
    extrude(amount=-F53_DEPTH, mode=Mode.SUBTRACT)

    # F54
    f54_edges = [f39.edges().sort_by_distance(p)[0] for p in [
        (-86, -158, 6),
        (0, -158, 6),
        (-86, -44, 6),
        (-56, -44, 6),
    ]]
    fillet(f54_edges, radius=F54_R)

    # F55 (on face) → F56 (cut)
    with BuildSketch(Plane.XY.offset(12)):
        with Locations((-69, -58)):
            Circle(F55_R)
    extrude(amount=-F56_DEPTH, mode=Mode.SUBTRACT)


solid = Compound([f1.part, f16.part, f26.part, f32.part, f39.part])
